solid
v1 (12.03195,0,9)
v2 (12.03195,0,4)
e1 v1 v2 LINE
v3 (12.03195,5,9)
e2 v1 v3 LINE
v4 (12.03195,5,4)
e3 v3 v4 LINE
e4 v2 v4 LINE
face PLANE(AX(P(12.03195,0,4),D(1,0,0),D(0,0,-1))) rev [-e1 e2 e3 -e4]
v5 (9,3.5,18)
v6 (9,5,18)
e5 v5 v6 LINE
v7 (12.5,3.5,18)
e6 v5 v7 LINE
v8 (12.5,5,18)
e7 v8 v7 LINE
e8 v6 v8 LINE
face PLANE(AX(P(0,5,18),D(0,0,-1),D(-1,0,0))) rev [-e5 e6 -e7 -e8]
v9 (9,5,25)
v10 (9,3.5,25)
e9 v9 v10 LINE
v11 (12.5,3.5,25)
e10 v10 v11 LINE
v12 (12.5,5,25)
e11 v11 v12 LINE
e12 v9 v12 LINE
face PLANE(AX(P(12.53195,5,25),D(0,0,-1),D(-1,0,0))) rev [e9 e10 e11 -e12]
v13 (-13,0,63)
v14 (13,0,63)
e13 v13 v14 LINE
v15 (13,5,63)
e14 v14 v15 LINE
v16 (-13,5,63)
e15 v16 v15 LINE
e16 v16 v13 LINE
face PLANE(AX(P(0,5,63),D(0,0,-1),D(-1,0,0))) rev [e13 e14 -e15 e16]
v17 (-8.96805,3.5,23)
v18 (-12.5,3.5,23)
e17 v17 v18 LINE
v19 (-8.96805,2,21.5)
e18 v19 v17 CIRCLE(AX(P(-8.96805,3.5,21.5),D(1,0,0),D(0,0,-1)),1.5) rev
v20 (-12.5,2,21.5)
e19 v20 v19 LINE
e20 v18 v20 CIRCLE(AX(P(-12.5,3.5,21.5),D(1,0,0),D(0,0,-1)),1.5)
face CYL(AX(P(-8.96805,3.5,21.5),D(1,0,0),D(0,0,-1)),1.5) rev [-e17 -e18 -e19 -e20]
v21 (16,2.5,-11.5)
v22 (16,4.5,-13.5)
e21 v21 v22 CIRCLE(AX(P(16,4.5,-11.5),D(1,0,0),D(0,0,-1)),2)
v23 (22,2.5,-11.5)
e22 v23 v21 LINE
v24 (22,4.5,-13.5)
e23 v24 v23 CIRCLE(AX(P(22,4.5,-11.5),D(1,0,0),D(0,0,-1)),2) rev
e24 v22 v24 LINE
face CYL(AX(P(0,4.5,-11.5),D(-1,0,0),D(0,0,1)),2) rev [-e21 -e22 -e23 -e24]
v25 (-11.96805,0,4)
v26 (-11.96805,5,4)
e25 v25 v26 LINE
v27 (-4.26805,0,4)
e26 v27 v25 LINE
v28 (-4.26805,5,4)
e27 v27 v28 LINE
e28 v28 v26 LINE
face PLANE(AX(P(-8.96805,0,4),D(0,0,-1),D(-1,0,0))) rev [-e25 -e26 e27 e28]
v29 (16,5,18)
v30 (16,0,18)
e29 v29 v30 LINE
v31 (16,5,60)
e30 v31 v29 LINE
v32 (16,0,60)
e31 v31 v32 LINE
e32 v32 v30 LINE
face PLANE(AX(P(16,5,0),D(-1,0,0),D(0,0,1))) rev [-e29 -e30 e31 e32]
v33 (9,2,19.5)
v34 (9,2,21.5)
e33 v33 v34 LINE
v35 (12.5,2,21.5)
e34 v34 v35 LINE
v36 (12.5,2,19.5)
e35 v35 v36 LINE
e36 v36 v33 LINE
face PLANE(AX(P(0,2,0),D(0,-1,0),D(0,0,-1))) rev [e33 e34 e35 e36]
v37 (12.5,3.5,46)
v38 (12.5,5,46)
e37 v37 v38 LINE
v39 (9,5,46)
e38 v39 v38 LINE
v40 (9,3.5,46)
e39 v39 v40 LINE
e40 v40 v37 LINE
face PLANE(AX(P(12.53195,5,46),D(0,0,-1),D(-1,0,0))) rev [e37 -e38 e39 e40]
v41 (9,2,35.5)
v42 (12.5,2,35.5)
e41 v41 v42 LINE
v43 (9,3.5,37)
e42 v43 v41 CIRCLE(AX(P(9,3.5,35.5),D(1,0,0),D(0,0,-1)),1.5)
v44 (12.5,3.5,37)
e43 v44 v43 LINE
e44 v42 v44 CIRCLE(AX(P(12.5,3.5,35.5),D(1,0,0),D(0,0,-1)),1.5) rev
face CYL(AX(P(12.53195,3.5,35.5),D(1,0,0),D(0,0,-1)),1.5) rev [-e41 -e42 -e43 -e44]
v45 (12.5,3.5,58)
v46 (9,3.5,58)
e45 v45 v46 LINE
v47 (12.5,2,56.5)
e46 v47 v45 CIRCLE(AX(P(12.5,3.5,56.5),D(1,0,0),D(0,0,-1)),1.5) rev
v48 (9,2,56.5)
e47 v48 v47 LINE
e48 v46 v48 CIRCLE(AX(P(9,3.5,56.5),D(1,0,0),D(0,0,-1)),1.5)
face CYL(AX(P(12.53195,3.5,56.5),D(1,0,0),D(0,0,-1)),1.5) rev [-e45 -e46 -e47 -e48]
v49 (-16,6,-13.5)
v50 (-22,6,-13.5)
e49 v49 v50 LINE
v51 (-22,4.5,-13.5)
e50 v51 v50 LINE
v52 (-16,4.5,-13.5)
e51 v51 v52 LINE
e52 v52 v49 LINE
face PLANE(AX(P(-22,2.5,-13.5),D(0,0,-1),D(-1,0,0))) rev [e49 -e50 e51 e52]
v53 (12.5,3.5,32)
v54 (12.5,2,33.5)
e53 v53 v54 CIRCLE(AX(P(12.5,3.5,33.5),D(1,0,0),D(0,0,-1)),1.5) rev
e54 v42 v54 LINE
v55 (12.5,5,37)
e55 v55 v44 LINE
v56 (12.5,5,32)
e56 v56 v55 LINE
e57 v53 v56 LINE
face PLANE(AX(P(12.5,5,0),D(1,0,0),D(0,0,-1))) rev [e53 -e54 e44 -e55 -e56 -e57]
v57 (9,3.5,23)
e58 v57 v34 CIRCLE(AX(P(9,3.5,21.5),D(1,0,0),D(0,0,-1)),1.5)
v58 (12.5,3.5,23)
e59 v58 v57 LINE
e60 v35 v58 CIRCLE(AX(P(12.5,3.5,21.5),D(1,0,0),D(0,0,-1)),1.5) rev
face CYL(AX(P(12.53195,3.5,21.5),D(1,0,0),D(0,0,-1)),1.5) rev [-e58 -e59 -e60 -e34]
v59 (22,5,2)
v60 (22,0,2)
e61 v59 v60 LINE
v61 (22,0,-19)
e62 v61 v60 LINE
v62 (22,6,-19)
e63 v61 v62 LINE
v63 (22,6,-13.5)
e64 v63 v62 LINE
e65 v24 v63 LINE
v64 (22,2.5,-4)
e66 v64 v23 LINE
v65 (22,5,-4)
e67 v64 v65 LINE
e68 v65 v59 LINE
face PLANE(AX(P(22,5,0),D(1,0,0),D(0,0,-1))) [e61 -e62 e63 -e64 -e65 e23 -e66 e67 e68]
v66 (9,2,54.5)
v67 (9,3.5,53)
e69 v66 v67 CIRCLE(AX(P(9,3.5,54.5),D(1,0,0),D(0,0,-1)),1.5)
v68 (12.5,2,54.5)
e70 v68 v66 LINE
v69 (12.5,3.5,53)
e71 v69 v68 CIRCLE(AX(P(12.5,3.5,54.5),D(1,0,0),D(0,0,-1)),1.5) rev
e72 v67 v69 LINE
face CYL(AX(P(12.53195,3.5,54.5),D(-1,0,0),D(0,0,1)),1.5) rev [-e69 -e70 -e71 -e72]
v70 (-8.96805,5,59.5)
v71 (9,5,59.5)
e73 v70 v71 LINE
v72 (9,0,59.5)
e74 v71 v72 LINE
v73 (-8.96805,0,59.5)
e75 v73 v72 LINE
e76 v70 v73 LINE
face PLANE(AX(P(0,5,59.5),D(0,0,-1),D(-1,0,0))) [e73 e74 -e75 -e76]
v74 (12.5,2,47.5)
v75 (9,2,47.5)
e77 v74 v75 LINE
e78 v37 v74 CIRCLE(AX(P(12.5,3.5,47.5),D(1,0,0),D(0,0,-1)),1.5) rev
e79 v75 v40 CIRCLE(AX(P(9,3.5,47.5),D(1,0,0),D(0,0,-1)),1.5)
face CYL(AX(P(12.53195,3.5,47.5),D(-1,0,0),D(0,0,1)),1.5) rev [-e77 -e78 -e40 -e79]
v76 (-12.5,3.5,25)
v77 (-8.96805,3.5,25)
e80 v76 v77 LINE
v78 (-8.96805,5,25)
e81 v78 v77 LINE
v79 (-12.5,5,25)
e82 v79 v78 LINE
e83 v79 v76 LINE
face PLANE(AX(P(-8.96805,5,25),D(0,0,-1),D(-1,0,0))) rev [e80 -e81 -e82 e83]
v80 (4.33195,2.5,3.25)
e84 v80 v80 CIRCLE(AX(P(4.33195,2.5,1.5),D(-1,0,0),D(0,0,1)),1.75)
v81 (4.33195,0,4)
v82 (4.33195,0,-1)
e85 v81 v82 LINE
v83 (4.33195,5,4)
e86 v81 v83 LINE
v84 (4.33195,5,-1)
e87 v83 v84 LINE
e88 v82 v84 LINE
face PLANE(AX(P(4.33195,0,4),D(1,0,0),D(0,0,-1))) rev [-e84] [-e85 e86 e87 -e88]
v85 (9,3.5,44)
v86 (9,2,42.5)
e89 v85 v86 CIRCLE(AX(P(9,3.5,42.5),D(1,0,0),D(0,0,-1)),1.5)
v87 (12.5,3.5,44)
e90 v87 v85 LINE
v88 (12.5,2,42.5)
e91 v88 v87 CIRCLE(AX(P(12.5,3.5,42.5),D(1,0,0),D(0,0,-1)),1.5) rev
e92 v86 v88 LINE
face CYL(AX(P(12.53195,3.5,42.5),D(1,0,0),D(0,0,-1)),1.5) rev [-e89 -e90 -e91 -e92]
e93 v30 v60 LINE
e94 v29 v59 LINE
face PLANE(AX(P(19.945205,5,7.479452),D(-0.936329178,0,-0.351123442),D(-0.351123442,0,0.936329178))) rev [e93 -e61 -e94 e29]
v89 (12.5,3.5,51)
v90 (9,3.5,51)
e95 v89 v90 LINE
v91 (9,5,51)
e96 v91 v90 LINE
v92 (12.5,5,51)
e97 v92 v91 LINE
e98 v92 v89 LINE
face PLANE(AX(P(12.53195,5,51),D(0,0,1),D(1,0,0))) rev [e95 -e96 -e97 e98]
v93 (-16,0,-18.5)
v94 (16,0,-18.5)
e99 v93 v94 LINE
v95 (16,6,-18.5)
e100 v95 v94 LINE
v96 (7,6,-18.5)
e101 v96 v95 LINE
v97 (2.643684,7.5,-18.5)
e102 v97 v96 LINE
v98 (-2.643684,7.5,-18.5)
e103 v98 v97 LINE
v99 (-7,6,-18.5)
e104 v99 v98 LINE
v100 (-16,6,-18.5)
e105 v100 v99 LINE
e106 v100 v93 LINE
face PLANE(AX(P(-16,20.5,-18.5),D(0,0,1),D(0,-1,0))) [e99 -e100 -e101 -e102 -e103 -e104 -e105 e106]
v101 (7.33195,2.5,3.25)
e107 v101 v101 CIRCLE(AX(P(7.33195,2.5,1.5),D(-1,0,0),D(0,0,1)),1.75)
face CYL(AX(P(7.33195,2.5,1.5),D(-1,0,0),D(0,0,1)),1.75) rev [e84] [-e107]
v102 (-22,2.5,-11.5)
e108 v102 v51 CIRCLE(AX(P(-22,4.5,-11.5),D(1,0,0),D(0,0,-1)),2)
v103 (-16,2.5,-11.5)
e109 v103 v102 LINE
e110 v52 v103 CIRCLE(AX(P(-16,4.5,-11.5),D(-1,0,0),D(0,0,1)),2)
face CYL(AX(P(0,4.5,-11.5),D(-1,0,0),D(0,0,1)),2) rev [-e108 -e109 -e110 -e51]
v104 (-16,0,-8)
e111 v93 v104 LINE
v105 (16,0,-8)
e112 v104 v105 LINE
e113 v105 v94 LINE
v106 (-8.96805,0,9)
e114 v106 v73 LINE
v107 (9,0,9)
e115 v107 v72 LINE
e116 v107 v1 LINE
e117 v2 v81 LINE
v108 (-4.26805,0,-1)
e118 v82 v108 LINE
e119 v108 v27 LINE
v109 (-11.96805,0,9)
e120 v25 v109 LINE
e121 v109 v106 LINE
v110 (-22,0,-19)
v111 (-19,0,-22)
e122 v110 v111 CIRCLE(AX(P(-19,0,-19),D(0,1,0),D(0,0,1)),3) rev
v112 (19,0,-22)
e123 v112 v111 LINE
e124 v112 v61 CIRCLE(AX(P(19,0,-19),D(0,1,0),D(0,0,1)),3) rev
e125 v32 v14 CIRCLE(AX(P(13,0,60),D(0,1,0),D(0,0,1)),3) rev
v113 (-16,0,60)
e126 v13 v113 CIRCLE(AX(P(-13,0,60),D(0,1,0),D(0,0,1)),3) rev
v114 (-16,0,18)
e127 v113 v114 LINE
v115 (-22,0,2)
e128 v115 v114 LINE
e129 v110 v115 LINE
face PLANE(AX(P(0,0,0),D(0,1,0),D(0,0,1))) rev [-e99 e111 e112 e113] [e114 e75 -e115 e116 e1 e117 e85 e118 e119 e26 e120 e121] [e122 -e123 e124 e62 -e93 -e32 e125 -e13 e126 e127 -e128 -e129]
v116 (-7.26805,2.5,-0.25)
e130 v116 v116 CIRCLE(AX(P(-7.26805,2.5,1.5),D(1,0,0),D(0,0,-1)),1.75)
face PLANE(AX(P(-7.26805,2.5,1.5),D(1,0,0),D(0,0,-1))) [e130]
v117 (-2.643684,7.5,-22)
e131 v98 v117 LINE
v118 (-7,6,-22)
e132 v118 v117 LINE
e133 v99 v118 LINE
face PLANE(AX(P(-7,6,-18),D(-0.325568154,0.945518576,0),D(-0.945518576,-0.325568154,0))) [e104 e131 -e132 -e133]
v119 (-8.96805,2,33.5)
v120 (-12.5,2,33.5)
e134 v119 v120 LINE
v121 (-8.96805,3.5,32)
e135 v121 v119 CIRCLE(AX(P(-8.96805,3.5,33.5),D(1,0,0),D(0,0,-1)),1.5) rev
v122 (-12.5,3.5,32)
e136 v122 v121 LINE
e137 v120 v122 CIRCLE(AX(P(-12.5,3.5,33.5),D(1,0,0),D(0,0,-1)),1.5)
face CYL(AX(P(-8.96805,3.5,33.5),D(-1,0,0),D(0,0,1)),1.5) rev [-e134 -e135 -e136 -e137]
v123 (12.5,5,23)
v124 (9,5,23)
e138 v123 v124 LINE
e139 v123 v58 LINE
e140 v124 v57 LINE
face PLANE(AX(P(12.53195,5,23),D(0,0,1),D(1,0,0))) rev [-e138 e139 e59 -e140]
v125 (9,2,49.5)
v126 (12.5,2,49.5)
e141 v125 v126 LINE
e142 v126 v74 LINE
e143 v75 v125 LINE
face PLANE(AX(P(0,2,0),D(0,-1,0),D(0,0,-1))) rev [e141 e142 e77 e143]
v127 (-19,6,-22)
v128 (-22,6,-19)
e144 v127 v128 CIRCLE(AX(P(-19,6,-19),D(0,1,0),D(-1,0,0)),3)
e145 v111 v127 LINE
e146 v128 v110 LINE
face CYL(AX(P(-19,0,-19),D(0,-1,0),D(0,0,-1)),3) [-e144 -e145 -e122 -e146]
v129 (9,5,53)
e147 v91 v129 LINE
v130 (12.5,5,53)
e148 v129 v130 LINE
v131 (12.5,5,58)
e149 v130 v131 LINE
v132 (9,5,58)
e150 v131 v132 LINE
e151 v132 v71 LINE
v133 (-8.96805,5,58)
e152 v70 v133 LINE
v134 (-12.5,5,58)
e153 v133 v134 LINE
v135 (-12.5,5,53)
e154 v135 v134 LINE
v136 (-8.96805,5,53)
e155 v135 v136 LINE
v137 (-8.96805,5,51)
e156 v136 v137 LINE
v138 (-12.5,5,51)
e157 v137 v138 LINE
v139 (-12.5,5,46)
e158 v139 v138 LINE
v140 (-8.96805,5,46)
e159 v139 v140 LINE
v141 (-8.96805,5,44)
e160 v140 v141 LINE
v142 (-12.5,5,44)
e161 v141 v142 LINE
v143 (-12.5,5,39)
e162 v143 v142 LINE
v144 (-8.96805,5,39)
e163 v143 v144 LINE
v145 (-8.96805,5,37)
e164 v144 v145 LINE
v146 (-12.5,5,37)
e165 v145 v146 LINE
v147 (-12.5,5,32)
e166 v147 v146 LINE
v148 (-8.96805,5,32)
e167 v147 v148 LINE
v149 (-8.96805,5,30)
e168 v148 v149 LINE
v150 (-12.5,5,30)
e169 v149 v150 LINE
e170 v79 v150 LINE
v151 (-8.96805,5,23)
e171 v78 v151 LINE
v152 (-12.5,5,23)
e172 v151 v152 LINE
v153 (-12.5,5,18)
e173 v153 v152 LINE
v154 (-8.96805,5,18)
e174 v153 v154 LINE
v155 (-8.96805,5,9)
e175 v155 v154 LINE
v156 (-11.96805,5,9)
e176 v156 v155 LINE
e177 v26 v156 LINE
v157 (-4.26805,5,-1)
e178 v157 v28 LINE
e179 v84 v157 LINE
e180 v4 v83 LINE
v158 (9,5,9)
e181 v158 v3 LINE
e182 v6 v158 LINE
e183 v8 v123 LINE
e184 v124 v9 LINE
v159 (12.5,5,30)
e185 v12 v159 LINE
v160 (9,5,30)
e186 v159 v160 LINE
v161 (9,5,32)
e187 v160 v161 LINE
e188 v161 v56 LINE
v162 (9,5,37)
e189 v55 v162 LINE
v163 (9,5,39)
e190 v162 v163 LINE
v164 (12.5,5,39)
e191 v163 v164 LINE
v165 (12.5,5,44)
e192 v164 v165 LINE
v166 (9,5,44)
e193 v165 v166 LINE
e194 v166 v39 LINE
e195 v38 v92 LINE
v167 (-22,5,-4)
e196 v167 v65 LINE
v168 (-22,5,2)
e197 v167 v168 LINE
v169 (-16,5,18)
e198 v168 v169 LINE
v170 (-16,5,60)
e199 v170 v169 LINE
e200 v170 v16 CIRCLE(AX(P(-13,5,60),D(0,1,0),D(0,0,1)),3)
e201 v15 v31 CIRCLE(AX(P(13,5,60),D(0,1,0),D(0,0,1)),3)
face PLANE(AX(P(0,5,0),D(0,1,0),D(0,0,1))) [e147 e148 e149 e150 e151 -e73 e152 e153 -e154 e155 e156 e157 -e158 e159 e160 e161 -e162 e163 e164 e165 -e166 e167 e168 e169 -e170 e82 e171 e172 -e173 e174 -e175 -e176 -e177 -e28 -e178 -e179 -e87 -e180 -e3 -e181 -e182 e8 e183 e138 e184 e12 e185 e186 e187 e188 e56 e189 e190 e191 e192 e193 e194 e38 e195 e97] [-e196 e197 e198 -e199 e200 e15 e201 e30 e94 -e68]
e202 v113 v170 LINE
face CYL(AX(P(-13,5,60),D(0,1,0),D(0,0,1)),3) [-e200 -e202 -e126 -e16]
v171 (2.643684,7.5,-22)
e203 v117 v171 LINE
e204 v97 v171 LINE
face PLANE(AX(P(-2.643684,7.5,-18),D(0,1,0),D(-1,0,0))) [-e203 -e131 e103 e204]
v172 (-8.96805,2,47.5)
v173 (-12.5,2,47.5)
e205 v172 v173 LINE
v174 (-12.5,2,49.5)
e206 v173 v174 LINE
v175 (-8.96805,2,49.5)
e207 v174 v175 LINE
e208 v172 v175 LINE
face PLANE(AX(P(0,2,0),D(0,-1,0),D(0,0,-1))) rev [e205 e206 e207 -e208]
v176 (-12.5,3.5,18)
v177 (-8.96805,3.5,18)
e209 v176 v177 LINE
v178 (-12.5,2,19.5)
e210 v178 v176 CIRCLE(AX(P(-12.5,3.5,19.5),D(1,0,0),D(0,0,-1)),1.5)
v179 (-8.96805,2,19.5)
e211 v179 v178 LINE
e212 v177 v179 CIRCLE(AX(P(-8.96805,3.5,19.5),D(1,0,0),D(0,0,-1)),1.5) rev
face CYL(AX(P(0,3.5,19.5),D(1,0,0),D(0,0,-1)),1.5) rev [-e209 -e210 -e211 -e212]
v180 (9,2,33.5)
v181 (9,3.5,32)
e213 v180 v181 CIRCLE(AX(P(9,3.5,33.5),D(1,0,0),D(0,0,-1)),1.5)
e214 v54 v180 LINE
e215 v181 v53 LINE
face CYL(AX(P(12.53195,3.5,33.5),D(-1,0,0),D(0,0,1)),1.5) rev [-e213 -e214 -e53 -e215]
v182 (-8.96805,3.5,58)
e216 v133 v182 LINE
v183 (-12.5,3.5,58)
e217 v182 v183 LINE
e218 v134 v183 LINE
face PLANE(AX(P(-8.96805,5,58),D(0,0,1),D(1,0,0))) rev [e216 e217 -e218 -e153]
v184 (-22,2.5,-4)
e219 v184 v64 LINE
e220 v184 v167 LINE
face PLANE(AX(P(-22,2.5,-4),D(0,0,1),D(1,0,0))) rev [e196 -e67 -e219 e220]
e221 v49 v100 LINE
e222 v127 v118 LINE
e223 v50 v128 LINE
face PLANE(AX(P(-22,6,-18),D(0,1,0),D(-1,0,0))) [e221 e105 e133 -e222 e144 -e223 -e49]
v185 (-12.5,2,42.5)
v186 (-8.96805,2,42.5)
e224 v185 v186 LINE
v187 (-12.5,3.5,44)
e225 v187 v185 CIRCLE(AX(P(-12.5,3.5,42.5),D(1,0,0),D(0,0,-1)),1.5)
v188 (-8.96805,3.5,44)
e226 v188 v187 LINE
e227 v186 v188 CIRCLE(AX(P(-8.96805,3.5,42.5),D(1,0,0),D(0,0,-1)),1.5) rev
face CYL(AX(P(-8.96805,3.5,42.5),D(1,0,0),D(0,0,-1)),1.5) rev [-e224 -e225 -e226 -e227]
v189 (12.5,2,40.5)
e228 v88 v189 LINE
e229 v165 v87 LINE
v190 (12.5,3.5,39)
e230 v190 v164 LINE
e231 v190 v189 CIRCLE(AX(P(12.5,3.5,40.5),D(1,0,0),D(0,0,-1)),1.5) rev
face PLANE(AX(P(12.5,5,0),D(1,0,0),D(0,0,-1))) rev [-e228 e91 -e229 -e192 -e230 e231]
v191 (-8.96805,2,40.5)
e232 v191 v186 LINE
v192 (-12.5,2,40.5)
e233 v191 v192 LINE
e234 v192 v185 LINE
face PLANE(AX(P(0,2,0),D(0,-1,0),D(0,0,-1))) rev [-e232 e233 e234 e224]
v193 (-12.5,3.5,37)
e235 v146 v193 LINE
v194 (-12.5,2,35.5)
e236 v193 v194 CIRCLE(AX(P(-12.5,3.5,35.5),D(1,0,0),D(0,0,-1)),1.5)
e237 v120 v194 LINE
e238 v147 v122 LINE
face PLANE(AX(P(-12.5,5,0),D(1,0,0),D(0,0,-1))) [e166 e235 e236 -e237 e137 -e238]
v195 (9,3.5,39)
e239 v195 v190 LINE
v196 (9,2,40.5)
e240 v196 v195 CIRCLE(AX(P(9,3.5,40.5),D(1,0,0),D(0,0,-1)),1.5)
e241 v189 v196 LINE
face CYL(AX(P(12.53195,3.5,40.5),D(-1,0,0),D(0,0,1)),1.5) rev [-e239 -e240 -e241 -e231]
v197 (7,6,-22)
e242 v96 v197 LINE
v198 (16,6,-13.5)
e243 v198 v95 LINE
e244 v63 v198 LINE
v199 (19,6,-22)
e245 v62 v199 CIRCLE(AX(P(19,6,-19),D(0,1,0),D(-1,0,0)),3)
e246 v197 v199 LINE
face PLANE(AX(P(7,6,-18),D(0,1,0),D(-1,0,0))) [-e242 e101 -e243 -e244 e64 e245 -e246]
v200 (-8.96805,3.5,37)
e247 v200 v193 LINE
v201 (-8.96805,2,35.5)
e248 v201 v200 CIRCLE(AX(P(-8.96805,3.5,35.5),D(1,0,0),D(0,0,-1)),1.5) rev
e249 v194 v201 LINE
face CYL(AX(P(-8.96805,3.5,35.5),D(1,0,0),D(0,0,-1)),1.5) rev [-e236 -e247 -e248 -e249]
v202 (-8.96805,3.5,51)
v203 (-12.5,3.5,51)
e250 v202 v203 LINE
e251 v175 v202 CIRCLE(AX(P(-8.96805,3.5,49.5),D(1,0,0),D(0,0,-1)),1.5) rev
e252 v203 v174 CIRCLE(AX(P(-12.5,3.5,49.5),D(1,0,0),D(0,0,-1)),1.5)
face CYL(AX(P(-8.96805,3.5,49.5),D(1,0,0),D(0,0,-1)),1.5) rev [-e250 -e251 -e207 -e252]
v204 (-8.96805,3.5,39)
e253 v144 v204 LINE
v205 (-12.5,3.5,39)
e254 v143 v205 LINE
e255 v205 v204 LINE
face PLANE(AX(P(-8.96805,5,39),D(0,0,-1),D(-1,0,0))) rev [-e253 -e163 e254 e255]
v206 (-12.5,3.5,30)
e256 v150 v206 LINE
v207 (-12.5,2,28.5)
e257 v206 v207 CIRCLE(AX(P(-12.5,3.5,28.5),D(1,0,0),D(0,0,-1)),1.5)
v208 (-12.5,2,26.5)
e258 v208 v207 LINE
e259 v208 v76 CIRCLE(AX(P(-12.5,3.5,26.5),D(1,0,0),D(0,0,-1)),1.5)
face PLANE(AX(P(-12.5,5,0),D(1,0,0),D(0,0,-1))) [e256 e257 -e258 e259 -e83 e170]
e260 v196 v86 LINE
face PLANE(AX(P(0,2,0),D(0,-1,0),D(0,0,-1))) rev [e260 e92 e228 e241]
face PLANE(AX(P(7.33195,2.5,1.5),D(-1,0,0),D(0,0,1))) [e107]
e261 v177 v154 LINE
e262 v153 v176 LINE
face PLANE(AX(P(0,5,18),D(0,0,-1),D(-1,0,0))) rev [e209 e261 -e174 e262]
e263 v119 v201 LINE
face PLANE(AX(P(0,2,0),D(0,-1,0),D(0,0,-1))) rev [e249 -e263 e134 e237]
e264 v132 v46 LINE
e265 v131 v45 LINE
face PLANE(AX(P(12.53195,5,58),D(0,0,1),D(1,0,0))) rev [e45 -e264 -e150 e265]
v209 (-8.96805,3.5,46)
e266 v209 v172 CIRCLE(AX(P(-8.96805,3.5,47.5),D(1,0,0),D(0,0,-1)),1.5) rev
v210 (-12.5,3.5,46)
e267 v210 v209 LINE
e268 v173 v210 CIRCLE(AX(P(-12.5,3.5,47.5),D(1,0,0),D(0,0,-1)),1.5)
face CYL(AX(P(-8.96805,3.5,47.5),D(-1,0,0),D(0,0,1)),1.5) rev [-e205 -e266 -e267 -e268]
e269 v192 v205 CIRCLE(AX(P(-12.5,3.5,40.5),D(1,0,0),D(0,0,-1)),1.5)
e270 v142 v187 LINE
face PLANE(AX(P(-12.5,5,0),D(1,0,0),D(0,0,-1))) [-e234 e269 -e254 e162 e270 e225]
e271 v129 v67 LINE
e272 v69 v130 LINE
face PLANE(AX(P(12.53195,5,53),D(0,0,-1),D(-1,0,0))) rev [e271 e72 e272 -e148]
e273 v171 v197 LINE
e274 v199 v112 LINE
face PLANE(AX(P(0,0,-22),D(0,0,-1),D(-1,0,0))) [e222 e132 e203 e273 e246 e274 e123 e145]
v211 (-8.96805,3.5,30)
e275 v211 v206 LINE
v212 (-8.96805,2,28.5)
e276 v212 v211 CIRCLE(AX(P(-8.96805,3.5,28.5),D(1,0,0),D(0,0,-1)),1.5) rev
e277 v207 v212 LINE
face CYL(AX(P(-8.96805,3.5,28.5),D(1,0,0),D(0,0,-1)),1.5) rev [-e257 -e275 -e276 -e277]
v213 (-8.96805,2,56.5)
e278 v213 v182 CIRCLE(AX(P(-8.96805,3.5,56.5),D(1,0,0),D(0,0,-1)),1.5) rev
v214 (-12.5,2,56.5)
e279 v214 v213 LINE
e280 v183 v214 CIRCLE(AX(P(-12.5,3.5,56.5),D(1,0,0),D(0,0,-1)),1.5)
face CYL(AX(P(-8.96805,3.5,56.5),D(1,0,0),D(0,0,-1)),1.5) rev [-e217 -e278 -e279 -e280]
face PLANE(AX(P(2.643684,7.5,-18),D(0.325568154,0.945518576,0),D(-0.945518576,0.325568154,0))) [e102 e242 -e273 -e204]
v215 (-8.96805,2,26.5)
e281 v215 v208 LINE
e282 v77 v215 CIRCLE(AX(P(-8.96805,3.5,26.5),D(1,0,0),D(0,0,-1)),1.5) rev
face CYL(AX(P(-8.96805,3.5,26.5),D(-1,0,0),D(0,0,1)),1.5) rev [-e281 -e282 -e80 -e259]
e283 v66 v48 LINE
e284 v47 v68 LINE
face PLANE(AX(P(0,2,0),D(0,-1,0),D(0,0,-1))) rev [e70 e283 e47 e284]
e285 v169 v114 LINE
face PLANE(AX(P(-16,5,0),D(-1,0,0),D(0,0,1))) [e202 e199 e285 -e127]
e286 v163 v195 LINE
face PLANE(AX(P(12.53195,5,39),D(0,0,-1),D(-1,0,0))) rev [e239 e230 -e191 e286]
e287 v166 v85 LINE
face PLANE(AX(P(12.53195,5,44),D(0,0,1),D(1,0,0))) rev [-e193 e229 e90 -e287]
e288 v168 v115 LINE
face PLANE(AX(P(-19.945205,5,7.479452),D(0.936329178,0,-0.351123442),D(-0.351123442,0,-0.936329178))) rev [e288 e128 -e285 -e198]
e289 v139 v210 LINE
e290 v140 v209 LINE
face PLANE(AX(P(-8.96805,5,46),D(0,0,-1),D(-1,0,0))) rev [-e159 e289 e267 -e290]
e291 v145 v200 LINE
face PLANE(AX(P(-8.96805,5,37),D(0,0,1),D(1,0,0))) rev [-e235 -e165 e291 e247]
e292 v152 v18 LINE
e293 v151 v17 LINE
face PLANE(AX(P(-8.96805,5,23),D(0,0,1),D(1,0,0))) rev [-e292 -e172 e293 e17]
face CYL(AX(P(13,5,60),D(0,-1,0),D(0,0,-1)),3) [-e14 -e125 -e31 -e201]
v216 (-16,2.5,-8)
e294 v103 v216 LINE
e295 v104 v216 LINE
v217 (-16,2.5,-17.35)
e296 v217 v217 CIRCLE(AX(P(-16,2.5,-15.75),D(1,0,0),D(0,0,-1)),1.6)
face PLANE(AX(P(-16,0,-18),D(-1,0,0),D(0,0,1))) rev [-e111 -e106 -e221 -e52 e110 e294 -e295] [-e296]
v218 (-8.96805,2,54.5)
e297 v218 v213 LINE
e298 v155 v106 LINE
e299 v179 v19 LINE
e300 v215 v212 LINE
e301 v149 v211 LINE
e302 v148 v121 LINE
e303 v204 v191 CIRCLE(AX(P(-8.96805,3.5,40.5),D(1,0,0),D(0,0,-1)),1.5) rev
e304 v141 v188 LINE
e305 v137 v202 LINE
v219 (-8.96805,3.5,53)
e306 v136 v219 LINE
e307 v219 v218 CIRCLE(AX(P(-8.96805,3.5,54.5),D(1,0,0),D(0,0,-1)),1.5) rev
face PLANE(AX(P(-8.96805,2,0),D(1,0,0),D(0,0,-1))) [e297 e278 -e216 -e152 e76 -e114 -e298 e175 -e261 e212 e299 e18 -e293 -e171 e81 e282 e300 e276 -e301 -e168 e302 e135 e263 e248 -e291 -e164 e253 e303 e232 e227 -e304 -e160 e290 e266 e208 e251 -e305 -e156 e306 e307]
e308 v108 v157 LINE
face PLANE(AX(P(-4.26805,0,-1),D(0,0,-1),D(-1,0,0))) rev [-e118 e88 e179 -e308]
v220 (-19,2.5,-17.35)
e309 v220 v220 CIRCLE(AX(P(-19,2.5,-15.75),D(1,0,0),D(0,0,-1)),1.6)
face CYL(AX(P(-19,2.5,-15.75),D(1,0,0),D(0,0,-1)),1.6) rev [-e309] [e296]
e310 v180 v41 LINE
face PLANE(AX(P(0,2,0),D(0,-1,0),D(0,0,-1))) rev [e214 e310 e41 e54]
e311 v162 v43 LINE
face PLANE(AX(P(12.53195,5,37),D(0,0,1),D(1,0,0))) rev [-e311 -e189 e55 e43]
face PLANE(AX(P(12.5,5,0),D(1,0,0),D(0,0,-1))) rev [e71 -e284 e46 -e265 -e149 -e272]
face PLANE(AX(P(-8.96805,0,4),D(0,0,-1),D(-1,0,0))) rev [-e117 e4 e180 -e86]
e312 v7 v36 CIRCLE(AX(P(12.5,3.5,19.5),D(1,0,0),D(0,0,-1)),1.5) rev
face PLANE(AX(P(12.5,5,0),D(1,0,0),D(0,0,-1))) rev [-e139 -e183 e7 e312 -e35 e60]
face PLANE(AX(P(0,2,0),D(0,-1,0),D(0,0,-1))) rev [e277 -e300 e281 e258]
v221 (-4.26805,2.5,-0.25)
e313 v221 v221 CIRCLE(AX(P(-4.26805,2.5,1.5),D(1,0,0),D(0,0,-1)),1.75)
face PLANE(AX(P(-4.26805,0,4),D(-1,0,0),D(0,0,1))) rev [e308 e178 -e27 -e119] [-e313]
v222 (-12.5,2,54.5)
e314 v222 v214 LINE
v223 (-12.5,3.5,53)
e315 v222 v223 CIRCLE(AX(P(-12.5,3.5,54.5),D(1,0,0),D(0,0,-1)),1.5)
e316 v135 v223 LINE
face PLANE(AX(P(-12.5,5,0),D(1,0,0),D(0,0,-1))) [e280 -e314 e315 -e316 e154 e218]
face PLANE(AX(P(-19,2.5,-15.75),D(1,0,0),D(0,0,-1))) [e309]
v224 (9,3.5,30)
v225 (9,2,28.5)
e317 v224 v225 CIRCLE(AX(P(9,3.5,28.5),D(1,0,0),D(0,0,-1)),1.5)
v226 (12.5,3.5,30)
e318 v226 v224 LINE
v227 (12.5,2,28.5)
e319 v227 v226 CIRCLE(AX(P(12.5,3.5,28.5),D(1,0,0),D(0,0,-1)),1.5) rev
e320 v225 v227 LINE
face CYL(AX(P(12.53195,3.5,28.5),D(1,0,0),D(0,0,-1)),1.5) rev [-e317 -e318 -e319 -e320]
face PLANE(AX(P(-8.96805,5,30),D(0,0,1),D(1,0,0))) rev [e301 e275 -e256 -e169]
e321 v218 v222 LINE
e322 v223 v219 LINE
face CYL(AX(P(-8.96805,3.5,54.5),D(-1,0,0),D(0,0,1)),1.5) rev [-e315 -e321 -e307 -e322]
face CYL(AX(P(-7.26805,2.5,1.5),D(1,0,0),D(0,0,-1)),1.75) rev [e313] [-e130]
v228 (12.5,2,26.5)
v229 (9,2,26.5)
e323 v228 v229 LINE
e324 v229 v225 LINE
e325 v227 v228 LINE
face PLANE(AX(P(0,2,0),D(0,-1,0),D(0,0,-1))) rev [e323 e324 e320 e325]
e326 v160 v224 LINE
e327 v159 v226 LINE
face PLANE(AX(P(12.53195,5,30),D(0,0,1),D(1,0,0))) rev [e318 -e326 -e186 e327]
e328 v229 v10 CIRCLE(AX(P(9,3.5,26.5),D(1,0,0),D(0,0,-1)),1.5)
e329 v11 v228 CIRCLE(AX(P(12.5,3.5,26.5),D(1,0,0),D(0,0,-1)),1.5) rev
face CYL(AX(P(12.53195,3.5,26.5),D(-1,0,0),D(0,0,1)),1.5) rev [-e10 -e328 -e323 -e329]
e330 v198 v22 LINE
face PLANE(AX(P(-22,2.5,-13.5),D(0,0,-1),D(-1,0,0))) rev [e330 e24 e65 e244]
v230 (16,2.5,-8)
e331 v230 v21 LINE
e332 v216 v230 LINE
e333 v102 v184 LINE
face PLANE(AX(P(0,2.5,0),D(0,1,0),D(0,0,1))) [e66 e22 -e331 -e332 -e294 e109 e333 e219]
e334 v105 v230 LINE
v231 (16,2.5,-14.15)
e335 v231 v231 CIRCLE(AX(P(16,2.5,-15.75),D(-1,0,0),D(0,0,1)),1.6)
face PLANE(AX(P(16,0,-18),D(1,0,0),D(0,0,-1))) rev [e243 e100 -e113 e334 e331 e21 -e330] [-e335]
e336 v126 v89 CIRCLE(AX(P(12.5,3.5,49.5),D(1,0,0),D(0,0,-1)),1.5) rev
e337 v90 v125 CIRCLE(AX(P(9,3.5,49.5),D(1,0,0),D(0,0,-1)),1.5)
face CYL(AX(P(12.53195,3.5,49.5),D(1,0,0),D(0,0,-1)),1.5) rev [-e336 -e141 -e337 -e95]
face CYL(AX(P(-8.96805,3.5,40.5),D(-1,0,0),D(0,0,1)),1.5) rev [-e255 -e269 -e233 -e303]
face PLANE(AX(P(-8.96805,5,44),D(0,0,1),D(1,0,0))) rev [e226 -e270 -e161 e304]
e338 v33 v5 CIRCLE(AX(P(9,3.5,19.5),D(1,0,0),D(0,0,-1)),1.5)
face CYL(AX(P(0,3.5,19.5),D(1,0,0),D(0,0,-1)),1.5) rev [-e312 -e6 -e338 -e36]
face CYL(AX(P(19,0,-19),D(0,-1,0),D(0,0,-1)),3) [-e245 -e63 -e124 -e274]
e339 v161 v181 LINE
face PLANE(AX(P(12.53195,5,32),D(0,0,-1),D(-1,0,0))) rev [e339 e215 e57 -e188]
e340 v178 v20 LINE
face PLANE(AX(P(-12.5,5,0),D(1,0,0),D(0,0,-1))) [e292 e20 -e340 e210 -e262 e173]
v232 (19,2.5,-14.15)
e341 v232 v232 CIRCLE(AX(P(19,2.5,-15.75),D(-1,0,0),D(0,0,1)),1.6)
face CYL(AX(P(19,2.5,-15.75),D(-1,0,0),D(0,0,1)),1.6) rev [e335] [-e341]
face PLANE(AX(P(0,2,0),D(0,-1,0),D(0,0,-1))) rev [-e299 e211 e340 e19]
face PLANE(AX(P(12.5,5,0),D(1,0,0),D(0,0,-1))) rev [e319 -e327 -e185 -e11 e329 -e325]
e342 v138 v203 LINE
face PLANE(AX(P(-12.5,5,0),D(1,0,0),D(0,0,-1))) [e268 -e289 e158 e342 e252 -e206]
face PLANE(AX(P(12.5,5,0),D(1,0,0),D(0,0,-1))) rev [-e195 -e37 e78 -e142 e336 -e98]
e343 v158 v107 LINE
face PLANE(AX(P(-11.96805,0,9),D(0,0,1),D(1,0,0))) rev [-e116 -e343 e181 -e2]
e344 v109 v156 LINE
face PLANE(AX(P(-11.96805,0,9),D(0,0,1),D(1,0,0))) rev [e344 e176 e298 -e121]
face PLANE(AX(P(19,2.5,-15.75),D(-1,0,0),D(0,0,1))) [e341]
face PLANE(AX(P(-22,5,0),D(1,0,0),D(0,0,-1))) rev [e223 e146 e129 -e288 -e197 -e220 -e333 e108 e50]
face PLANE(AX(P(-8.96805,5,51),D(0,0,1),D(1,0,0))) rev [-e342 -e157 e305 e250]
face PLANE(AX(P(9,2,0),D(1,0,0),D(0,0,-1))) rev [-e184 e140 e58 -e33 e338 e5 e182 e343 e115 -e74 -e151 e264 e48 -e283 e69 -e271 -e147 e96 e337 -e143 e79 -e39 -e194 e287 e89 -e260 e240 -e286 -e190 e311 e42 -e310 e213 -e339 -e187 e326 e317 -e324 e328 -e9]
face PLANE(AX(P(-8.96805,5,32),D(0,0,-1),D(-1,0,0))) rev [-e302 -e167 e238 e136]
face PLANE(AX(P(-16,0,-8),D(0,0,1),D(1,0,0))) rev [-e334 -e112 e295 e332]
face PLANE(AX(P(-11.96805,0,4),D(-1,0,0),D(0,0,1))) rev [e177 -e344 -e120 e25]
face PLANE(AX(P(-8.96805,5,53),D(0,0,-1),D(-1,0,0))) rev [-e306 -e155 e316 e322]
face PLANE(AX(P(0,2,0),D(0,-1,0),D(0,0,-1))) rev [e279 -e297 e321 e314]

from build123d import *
from OCP.BRepFilletAPI import BRepFilletAPI_MakeChamfer

# Parameters (mm, degrees)
SKETCH1_W                = 44
SKETCH1_H                = 22
BOSS_EXTRUDE1_DEPTH      = 5
SKETCH2_W                = 3.531949687
SKETCH2_H                = 41.5
SKETCH2_W_2              = 3.5
BOSS_EXTRUDE2_DEPTH      = 2
SKETCH3_W                = 44
SKETCH3_H                = 9.5
CUT_EXTRUDE1_DEPTH       = 2.5
SKETCH4_W                = 17.968050313
SKETCH4_H                = 14
CUT_EXTRUDE2_DEPTH       = 5
SKETCH5_W                = 24
SKETCH5_H                = 5
CUT_EXTRUDE3_DEPTH       = 5
SKETCH6_W                = 8.6
SKETCH6_H                = 5
CUT_EXTRUDE4_DEPTH       = 5
SKETCH7_W                = 14
SKETCH7_H                = 2
BOSS_EXTRUDE3_DEPTH      = 1.5
CHAMFER1_SIZE            = 1.5
CHAMFER1_SIZE_2          = 4.356316317
SKETCH8_W                = 32
SKETCH8_H                = 10
CUT_EXTRUDE5_DEPTH       = 5
FILLET3_R                = 3
SKETCH9_R                = 1.75
CUT_EXTRUDE6_DEPTH       = 3
CUT_EXTRUDE7_START       = -3
SKETCH10_R               = 1.75
CUT_EXTRUDE7_DEPTH       = 3
SKETCH11_R               = 1.6
CUT_EXTRUDE8_DEPTH       = 3
CUT_EXTRUDE9_START       = -3
SKETCH12_R               = 1.6
CUT_EXTRUDE9_DEPTH       = 3
SKETCH13_W               = 3.531949687
SKETCH13_H               = 2
BOSS_EXTRUDE5_DEPTH      = 3
FILLET4_R                = 1.5
BOSS_EXTRUDE6_DEPTH      = 2
BOSS_EXTRUDE6_DEPTH_BACK = 2
SKETCH15_W               = 6
SKETCH15_H               = 1
BOSS_EXTRUDE7_DEPTH      = 4.5
FILLET5_R                = 2
FILLET6_R                = 3
CUT_EXTRUDE10_DEPTH      = 14.5
CUT_EXTRUDE10_DEPTH_BACK = 14.5
SKETCH16_W               = 32
SKETCH16_H               = 0.5


with BuildPart() as part:
    # Sketch1 → Boss-Extrude1 (new body)
    with BuildSketch(Plane(origin=(0, 0, 0), x_dir=(1, 0, 0), z_dir=(0, 1, 0))):
        with Locations((0, 9)):
            Rectangle(SKETCH1_W, SKETCH1_H)
        Polygon((-16, -18), (16, -18), (22, -2), (-22, -2), align=None)
        Polygon((-12.5, -18), (-16, -18), (-16, -63), (16, -63), (16, -18), (12.5, -18), (12.5, -59.5), (-12.5, -59.5), align=None)
    extrude(amount=BOSS_EXTRUDE1_DEPTH)

    # Sketch2 → Boss-Extrude2 (add)
    with BuildSketch(Plane.XZ):
        with Locations((-10.734025156, 38.75)):
            Rectangle(SKETCH2_W, SKETCH2_H)
        with Locations((10.75, 38.75)):
            Rectangle(SKETCH2_W_2, SKETCH2_H)
    extrude(amount=-BOSS_EXTRUDE2_DEPTH)

    # Sketch3 → Cut-Extrude1 (cut)
    with BuildSketch(Plane(origin=(0, 5, 0), x_dir=(1, 0, 0), z_dir=(0, 1, 0))):
        with Locations((0, 8.75)):
            Rectangle(SKETCH3_W, SKETCH3_H)
    extrude(amount=-CUT_EXTRUDE1_DEPTH, mode=Mode.SUBTRACT)

    # Sketch4 → Cut-Extrude2 (cut)
    with BuildSketch(Plane(origin=(0, 5, 0), x_dir=(1, 0, 0), z_dir=(0, 1, 0))):
        with Locations((0.015974843, -11)):
            Rectangle(SKETCH4_W, SKETCH4_H)
    extrude(amount=-CUT_EXTRUDE2_DEPTH, mode=Mode.SUBTRACT)

    # Sketch5 → Cut-Extrude3 (cut)
    with BuildSketch(Plane(origin=(0, 5, 0), x_dir=(1, 0, 0), z_dir=(0, 1, 0))):
        with Locations((0.031949687, -6.5)):
            Rectangle(SKETCH5_W, SKETCH5_H)
    extrude(amount=-CUT_EXTRUDE3_DEPTH, mode=Mode.SUBTRACT)

    # Sketch6 → Cut-Extrude4 (cut)
    with BuildSketch(Plane(origin=(0, 5, 0), x_dir=(1, 0, 0), z_dir=(0, 1, 0))):
        with Locations((0.031949687, -1.5)):
            Rectangle(SKETCH6_W, SKETCH6_H)
    extrude(amount=-CUT_EXTRUDE4_DEPTH, mode=Mode.SUBTRACT)

    # Sketch7 → Boss-Extrude3 (add)
    with BuildSketch(Plane(origin=(0, 5, 0), x_dir=(1, 0, 0), z_dir=(0, 1, 0))):
        with Locations((0, 19)):
            Rectangle(SKETCH7_W, SKETCH7_H)
    extrude(amount=BOSS_EXTRUDE3_DEPTH)

    # Chamfer1
    chamfer1_edges_1 = [part.edges().sort_by_distance(p)[0] for p in [
        (7, 6.5, -19),
    ]]
    chamfer1_side_1 = [part.faces().sort_by_distance(p)[0] for p in [
        (7, 6.47, -19),
    ]]
    chamfer1_edges_2 = [part.edges().sort_by_distance(p)[0] for p in [
        (-7, 6.5, -19),
    ]]
    chamfer1_side_2 = [part.faces().sort_by_distance(p)[0] for p in [
        (-7, 6.47, -19),
    ]]
    chamfer1 = BRepFilletAPI_MakeChamfer(part.part.solid().wrapped)
    for e in chamfer1_edges_1:
        chamfer1.Add(CHAMFER1_SIZE - 0.0001, CHAMFER1_SIZE_2 - 0.0001, e.wrapped, chamfer1_side_1[0].wrapped)
    for e in chamfer1_edges_2:
        chamfer1.Add(CHAMFER1_SIZE - 0.0001, CHAMFER1_SIZE_2 - 0.0001, e.wrapped, chamfer1_side_2[0].wrapped)
    add(Compound.cast(chamfer1.Shape()), mode=Mode.REPLACE)  # a hair under: the kernel refuses the full size

    # Sketch8 → Cut-Extrude5 (cut)
    with BuildSketch(Plane(origin=(0, 5, 0), x_dir=(1, 0, 0), z_dir=(0, 1, 0))):
        with Locations((0, 13)):
            Rectangle(SKETCH8_W, SKETCH8_H)
    extrude(amount=-CUT_EXTRUDE5_DEPTH, mode=Mode.SUBTRACT)

    # Fillet3
    fillet3_edges = [part.edges().sort_by_distance(p)[0] for p in [
        (16, 2.5, 63),
        (-16, 2.5, 63),
    ]]
    fillet(fillet3_edges, radius=FILLET3_R)

    # Sketch9 → Cut-Extrude6 (cut)
    with BuildSketch(Plane(origin=(-4.268050313, 0, 0), x_dir=(0, 0, -1), z_dir=(1, 0, 0))):
        with Locations((-1.5, 2.5)):
            Circle(SKETCH9_R)
    extrude(amount=-CUT_EXTRUDE6_DEPTH, mode=Mode.SUBTRACT)

    # Sketch10 → Cut-Extrude7 (cut)
    with BuildSketch(Plane.ZY.offset(-4.331949687).offset(CUT_EXTRUDE7_START)):
        with Locations(Location((1.5, 2.5, 0), (0, 0, 180))):
            Circle(SKETCH10_R)
    extrude(amount=CUT_EXTRUDE7_DEPTH, mode=Mode.SUBTRACT)

    # Sketch11 → Cut-Extrude8 (cut)
    with BuildSketch(Plane.ZY.offset(-16)):
        with Locations((-15.75, 2.5)):
            Circle(SKETCH11_R)
    extrude(amount=-CUT_EXTRUDE8_DEPTH, mode=Mode.SUBTRACT)

    # Sketch12 → Cut-Extrude9 (cut)
    with BuildSketch(Plane(origin=(-16, 0, 0), x_dir=(0, 0, -1), z_dir=(1, 0, 0)).offset(CUT_EXTRUDE9_START)):
        with Locations(Location((15.75, 2.5, 0), (0, 0, 180))):
            Circle(SKETCH12_R)
    extrude(amount=CUT_EXTRUDE9_DEPTH, mode=Mode.SUBTRACT)

    # Sketch13 → Boss-Extrude5 (add)
    with BuildSketch(Plane(origin=(0, 2, 0), x_dir=(1, 0, 0), z_dir=(0, 1, 0))):
        with Locations((-10.734025156, -24)):
            Rectangle(SKETCH13_W, SKETCH13_H)
        with Locations((10.765974844, -24)):
            Rectangle(SKETCH13_W, SKETCH13_H)
        with Locations((10.765974844, -31)):
            Rectangle(SKETCH13_W, SKETCH13_H)
        with Locations((10.765974844, -38)):
            Rectangle(SKETCH13_W, SKETCH13_H)
        with Locations((10.765974844, -45)):
            Rectangle(SKETCH13_W, SKETCH13_H)
        with Locations((10.765974844, -52)):
            Rectangle(SKETCH13_W, SKETCH13_H)
        with Locations((10.765974844, -59)):
            Rectangle(SKETCH13_W, SKETCH13_H)
        with Locations((-10.734025156, -31)):
            Rectangle(SKETCH13_W, SKETCH13_H)
        with Locations((-10.734025156, -38)):
            Rectangle(SKETCH13_W, SKETCH13_H)
        with Locations((-10.734025156, -45)):
            Rectangle(SKETCH13_W, SKETCH13_H)
        with Locations((-10.734025156, -52)):
            Rectangle(SKETCH13_W, SKETCH13_H)
        with Locations((-10.734025156, -59)):
            Rectangle(SKETCH13_W, SKETCH13_H)
    extrude(amount=BOSS_EXTRUDE5_DEPTH)

    # Fillet4
    fillet4_edges = [part.edges().sort_by_distance(p)[0] for p in [
        (-10.734025157, 2, 23),
        (-10.734025157, 2, 25),
        (10.75, 2, 23),
        (10.75, 2, 25),
        (10.75, 2, 30),
        (10.75, 2, 32),
        (10.75, 2, 37),
        (10.75, 2, 39),
        (10.75, 2, 44),
        (10.75, 2, 46),
        (10.75, 2, 51),
        (10.75, 2, 53),
        (10.75, 2, 58),
        (-10.734025157, 2, 30),
        (-10.734025157, 2, 32),
        (-10.734025157, 2, 37),
        (-10.734025157, 2, 39),
        (-10.734025157, 2, 44),
        (-10.734025157, 2, 46),
        (-10.734025157, 2, 51),
        (-10.734025157, 2, 53),
        (-10.734025157, 2, 58),
        (-10.734025157, 2, 18),
        (10.75, 2, 18),
    ]]
    fillet(fillet4_edges, radius=FILLET4_R)

    # Sketch14 → Boss-Extrude6 (add, two sides: drawn at the far end of the back side and taken through both)
    with BuildSketch(Plane(origin=(0, 0, -20), x_dir=(-1, 0, 0), z_dir=(0, 0, -1)).offset(-BOSS_EXTRUDE6_DEPTH_BACK)):
        Polygon((-22, 6), (-22, 0), (22, 0), (22, 6), (7, 6), (2.643683683, 7.5), (-2.643683683, 7.5), (-7, 6), align=None)
    extrude(amount=BOSS_EXTRUDE6_DEPTH + BOSS_EXTRUDE6_DEPTH_BACK)

    # Sketch15 → Boss-Extrude7 (add)
    with BuildSketch(Plane.XY.offset(-18)):
        with Locations((19, 5.5)):
            Rectangle(SKETCH15_W, SKETCH15_H)
        with Locations((-19, 5.5)):
            Rectangle(SKETCH15_W, SKETCH15_H)
    extrude(amount=BOSS_EXTRUDE7_DEPTH)

    # Fillet5
    fillet5_edges = [part.edges().sort_by_distance(p)[0] for p in [
        (-19, 2.5, -13.5),
        (19, 2.5, -13.5),
    ]]
    fillet(fillet5_edges, radius=FILLET5_R)

    # Fillet6
    fillet6_edges = [part.edges().sort_by_distance(p)[0] for p in [
        (22, 3, -22),
        (-22, 3, -22),
    ]]
    fillet(fillet6_edges, radius=FILLET6_R)

    # Sketch16 → Cut-Extrude10 (cut, two sides: drawn at the far end of the back side and taken through both)
    with BuildSketch(Plane(origin=(0, 6, 0), x_dir=(1, 0, 0), z_dir=(0, 1, 0)).offset(-CUT_EXTRUDE10_DEPTH_BACK)):
        with Locations((0, 18.25)):
            Rectangle(SKETCH16_W, SKETCH16_H)
    extrude(amount=CUT_EXTRUDE10_DEPTH + CUT_EXTRUDE10_DEPTH_BACK, mode=Mode.SUBTRACT)


solid = part.part
